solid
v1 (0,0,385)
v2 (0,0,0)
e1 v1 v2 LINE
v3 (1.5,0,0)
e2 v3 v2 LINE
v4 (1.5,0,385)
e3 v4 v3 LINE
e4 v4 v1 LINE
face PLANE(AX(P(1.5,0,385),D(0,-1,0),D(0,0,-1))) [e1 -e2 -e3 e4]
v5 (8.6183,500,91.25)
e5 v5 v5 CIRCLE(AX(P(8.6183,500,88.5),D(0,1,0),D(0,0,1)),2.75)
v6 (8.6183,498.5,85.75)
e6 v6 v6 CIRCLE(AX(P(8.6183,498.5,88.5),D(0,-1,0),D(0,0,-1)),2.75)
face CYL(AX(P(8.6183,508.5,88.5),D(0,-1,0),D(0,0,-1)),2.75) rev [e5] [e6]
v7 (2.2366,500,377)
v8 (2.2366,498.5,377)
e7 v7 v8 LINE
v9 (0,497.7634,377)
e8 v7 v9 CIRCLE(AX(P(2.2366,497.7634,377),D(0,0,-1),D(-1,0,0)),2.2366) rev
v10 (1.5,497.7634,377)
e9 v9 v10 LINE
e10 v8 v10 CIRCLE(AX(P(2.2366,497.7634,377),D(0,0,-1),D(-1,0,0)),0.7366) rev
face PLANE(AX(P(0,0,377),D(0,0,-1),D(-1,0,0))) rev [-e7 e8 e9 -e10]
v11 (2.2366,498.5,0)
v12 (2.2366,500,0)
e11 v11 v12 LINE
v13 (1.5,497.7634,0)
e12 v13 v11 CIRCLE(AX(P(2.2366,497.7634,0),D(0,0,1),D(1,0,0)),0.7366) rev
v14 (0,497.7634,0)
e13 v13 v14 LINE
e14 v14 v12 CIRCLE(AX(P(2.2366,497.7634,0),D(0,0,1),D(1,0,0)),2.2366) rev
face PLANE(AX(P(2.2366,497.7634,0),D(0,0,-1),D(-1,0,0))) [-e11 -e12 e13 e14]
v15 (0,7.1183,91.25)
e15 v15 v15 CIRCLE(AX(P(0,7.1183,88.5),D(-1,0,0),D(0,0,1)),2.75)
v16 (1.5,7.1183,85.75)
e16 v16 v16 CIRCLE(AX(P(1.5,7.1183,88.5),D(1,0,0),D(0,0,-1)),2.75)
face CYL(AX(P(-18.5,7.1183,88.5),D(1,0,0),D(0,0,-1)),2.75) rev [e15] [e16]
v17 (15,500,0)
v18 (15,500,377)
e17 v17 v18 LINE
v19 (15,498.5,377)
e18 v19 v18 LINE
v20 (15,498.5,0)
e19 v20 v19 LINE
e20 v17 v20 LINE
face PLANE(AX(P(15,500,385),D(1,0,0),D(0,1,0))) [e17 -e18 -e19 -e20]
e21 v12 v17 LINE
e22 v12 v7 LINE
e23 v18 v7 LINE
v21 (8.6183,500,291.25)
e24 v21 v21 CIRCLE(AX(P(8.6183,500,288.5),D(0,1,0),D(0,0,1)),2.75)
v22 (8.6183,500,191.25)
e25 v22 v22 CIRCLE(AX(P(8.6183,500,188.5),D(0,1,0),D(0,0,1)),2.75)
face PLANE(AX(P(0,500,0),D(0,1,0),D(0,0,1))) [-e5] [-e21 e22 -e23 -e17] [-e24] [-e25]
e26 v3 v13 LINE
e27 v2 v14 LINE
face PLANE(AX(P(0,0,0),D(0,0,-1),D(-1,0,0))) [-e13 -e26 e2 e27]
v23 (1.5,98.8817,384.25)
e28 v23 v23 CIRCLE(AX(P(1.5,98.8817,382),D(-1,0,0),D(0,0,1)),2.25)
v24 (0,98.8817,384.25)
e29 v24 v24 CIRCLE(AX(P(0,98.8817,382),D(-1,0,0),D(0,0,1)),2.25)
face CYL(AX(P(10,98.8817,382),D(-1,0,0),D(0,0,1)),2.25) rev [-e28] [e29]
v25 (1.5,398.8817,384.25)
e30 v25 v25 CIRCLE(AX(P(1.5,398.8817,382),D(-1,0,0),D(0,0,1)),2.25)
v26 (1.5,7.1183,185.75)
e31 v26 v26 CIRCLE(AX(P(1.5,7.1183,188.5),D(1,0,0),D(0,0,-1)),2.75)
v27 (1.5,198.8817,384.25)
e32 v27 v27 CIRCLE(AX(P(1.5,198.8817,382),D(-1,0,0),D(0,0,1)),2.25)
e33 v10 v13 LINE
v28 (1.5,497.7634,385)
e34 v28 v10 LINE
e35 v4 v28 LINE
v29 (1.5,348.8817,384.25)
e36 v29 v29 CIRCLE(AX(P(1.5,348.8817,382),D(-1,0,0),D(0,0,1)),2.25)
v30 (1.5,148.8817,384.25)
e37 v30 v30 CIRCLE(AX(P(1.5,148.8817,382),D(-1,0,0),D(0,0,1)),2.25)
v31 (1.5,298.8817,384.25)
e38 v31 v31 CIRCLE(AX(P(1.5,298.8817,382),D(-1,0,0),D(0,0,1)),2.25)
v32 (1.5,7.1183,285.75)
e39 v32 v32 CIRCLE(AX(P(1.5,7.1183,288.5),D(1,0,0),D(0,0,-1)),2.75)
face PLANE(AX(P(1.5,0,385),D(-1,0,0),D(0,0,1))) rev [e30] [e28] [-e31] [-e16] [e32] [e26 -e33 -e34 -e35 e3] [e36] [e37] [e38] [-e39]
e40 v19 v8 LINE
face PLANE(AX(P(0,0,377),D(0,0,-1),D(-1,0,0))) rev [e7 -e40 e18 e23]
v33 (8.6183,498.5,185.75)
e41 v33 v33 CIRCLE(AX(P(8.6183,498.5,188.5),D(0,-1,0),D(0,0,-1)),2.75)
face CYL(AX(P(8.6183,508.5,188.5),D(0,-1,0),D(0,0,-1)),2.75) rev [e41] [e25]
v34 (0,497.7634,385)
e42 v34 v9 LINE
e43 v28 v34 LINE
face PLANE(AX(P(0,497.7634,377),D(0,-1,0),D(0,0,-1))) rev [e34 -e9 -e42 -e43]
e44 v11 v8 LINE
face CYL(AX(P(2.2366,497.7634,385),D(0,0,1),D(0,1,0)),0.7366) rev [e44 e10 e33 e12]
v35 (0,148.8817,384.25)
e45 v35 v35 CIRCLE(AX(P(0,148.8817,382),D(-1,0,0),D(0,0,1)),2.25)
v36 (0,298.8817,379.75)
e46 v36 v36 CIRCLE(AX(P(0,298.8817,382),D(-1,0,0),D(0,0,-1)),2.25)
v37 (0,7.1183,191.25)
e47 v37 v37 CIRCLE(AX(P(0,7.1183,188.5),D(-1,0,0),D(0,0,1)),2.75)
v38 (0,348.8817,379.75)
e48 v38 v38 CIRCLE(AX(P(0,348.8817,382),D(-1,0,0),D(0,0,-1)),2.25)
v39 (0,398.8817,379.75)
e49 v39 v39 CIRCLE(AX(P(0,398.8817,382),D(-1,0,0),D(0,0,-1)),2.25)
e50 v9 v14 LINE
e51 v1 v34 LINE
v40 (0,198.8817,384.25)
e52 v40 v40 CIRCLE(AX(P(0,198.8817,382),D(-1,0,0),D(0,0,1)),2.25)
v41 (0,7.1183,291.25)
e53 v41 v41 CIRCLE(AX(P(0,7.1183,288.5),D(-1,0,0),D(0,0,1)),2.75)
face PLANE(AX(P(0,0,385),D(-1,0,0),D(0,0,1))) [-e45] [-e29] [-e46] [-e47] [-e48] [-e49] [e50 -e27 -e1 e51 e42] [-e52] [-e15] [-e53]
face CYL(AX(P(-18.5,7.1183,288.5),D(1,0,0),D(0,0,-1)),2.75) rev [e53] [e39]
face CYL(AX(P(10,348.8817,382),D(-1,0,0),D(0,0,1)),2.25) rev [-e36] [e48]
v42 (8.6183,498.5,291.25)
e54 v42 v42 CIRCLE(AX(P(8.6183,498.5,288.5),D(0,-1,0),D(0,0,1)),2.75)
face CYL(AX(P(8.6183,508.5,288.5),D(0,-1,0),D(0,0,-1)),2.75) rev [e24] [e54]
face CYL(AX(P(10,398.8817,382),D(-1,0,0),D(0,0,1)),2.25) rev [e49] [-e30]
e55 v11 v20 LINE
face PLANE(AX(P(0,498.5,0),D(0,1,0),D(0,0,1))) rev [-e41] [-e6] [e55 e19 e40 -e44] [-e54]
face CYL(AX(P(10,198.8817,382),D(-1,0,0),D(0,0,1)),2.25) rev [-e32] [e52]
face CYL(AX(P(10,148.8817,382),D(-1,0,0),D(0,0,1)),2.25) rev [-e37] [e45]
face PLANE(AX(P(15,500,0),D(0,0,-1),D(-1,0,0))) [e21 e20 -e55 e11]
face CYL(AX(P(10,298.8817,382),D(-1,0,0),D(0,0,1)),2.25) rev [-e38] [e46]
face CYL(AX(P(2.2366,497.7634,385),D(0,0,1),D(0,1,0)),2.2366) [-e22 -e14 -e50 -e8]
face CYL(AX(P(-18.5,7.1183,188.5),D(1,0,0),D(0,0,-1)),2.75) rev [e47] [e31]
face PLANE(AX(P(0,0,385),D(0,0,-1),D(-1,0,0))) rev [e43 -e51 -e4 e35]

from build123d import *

# Parameters (mm, degrees)
SKETCH_1_W                       = 1.5
SKETCH_1_H                       = 500
SM_BASE_FLANGE_1_DEPTH           = 385
SM_EDGE_FLANGE_1_STRIP_W         = 7.4732
SM_EDGE_FLANGE_1_STRIP_H         = 1.5
SM_EDGE_FLANGE_1_STRIP_CUT_DEPTH = 385
SM_EDGE_FLANGE_1_DEPTH           = 385
SKETCH_12_W                      = 16.530990935
SKETCH_12_H                      = 8.400471009
CUT_EXTRUDE_1_DEPTH              = 8
SKETCH_13_R                      = 2.75
CUT_EXTRUDE_2_DEPTH              = 20
SKETCH_14_R                      = 2.75
CUT_EXTRUDE_3_DEPTH              = 10
SKETCH_15_R                      = 2.25
CUT_EXTRUDE_4_DEPTH              = 10


# Sheet-metal steps are written as plain solids
with BuildPart() as part:
    # Sketch 1 → 基体-法兰1 (new body)
    with BuildSketch(Plane.XY):
        with Locations((0.75, 250)):
            Rectangle(SKETCH_1_W, SKETCH_1_H)
    extrude(amount=SM_BASE_FLANGE_1_DEPTH)

    # 边线-法兰1 strip (across the edge) → 边线-法兰1 strip cut (cut)
    with BuildSketch(Plane(origin=(1.5, 500, 0), x_dir=(0, -1, 0), z_dir=(0, 0, 1))):
        with Locations((-1.5, -0.75)):
            Rectangle(SM_EDGE_FLANGE_1_STRIP_W, SM_EDGE_FLANGE_1_STRIP_H)
    extrude(amount=SM_EDGE_FLANGE_1_STRIP_CUT_DEPTH, mode=Mode.SUBTRACT)

    # 边线-法兰1 section (across the edge) → 边线-法兰1 (add)
    with BuildSketch(Plane(origin=(1.5, 500, 0), x_dir=(0, -1, 0), z_dir=(0, 0, 1))):
        with BuildLine():
            Line((0, 0.7366), (0, 13.5))
            Line((0, 13.5), (1.5, 13.5))
            Line((1.5, 13.5), (1.5, 0.7366))
            ThreePointArc((1.5, 0.7366), (1.715745145, 0.215745145), (2.2366, 0))
            Line((2.2366, 0), (2.2366, -1.5))
            ThreePointArc((2.2366, -1.5), (0.655084973, -0.844915027), (0, 0.7366))
        make_face()
    extrude(amount=SM_EDGE_FLANGE_1_DEPTH)

    # 草图12 → 切除-拉伸1 (cut)
    with BuildSketch(Plane.XY.offset(385)):
        with Locations((8.265495468, 501.963635505)):
            Rectangle(SKETCH_12_W, SKETCH_12_H)
    extrude(amount=-CUT_EXTRUDE_1_DEPTH, mode=Mode.SUBTRACT)

    # 草图13 → 切除-拉伸2 (cut)
    with BuildSketch(Plane(origin=(1.5, 0, 0), x_dir=(0, 0, -1), z_dir=(1, 0, 0))):
        with Locations((-288.5, 7.1183)):
            Circle(SKETCH_13_R)
        with Locations((-188.5, 7.1183)):
            Circle(SKETCH_13_R)
        with Locations((-88.5, 7.1183)):
            Circle(SKETCH_13_R)
    extrude(amount=-CUT_EXTRUDE_2_DEPTH, mode=Mode.SUBTRACT)

    # 草图14 → 切除-拉伸3 (cut)
    with BuildSketch(Plane.XZ.offset(-498.5)):
        with Locations(Location((8.6183, 88.5, 0), (0, 0, 270))):
            Circle(SKETCH_14_R)
        with Locations(Location((8.6183, 188.5, 0), (0, 0, 270))):
            Circle(SKETCH_14_R)
        with Locations(Location((8.6183, 288.5, 0), (0, 0, 90))):
            Circle(SKETCH_14_R)
    extrude(amount=-CUT_EXTRUDE_3_DEPTH, mode=Mode.SUBTRACT)

    # 草图15 → 切除-拉伸4 (cut)
    with BuildSketch(Plane.ZY):
        with Locations((382, 98.8817)):
            Circle(SKETCH_15_R)
        with Locations((382, 148.8817)):
            Circle(SKETCH_15_R)
        with Locations((382, 198.8817)):
            Circle(SKETCH_15_R)
        with Locations((382, 298.8817)):
            Circle(SKETCH_15_R)
        with Locations((382, 348.8817)):
            Circle(SKETCH_15_R)
        with Locations((382, 398.8817)):
            Circle(SKETCH_15_R)
    extrude(amount=-CUT_EXTRUDE_4_DEPTH, mode=Mode.SUBTRACT)


solid = part.part
